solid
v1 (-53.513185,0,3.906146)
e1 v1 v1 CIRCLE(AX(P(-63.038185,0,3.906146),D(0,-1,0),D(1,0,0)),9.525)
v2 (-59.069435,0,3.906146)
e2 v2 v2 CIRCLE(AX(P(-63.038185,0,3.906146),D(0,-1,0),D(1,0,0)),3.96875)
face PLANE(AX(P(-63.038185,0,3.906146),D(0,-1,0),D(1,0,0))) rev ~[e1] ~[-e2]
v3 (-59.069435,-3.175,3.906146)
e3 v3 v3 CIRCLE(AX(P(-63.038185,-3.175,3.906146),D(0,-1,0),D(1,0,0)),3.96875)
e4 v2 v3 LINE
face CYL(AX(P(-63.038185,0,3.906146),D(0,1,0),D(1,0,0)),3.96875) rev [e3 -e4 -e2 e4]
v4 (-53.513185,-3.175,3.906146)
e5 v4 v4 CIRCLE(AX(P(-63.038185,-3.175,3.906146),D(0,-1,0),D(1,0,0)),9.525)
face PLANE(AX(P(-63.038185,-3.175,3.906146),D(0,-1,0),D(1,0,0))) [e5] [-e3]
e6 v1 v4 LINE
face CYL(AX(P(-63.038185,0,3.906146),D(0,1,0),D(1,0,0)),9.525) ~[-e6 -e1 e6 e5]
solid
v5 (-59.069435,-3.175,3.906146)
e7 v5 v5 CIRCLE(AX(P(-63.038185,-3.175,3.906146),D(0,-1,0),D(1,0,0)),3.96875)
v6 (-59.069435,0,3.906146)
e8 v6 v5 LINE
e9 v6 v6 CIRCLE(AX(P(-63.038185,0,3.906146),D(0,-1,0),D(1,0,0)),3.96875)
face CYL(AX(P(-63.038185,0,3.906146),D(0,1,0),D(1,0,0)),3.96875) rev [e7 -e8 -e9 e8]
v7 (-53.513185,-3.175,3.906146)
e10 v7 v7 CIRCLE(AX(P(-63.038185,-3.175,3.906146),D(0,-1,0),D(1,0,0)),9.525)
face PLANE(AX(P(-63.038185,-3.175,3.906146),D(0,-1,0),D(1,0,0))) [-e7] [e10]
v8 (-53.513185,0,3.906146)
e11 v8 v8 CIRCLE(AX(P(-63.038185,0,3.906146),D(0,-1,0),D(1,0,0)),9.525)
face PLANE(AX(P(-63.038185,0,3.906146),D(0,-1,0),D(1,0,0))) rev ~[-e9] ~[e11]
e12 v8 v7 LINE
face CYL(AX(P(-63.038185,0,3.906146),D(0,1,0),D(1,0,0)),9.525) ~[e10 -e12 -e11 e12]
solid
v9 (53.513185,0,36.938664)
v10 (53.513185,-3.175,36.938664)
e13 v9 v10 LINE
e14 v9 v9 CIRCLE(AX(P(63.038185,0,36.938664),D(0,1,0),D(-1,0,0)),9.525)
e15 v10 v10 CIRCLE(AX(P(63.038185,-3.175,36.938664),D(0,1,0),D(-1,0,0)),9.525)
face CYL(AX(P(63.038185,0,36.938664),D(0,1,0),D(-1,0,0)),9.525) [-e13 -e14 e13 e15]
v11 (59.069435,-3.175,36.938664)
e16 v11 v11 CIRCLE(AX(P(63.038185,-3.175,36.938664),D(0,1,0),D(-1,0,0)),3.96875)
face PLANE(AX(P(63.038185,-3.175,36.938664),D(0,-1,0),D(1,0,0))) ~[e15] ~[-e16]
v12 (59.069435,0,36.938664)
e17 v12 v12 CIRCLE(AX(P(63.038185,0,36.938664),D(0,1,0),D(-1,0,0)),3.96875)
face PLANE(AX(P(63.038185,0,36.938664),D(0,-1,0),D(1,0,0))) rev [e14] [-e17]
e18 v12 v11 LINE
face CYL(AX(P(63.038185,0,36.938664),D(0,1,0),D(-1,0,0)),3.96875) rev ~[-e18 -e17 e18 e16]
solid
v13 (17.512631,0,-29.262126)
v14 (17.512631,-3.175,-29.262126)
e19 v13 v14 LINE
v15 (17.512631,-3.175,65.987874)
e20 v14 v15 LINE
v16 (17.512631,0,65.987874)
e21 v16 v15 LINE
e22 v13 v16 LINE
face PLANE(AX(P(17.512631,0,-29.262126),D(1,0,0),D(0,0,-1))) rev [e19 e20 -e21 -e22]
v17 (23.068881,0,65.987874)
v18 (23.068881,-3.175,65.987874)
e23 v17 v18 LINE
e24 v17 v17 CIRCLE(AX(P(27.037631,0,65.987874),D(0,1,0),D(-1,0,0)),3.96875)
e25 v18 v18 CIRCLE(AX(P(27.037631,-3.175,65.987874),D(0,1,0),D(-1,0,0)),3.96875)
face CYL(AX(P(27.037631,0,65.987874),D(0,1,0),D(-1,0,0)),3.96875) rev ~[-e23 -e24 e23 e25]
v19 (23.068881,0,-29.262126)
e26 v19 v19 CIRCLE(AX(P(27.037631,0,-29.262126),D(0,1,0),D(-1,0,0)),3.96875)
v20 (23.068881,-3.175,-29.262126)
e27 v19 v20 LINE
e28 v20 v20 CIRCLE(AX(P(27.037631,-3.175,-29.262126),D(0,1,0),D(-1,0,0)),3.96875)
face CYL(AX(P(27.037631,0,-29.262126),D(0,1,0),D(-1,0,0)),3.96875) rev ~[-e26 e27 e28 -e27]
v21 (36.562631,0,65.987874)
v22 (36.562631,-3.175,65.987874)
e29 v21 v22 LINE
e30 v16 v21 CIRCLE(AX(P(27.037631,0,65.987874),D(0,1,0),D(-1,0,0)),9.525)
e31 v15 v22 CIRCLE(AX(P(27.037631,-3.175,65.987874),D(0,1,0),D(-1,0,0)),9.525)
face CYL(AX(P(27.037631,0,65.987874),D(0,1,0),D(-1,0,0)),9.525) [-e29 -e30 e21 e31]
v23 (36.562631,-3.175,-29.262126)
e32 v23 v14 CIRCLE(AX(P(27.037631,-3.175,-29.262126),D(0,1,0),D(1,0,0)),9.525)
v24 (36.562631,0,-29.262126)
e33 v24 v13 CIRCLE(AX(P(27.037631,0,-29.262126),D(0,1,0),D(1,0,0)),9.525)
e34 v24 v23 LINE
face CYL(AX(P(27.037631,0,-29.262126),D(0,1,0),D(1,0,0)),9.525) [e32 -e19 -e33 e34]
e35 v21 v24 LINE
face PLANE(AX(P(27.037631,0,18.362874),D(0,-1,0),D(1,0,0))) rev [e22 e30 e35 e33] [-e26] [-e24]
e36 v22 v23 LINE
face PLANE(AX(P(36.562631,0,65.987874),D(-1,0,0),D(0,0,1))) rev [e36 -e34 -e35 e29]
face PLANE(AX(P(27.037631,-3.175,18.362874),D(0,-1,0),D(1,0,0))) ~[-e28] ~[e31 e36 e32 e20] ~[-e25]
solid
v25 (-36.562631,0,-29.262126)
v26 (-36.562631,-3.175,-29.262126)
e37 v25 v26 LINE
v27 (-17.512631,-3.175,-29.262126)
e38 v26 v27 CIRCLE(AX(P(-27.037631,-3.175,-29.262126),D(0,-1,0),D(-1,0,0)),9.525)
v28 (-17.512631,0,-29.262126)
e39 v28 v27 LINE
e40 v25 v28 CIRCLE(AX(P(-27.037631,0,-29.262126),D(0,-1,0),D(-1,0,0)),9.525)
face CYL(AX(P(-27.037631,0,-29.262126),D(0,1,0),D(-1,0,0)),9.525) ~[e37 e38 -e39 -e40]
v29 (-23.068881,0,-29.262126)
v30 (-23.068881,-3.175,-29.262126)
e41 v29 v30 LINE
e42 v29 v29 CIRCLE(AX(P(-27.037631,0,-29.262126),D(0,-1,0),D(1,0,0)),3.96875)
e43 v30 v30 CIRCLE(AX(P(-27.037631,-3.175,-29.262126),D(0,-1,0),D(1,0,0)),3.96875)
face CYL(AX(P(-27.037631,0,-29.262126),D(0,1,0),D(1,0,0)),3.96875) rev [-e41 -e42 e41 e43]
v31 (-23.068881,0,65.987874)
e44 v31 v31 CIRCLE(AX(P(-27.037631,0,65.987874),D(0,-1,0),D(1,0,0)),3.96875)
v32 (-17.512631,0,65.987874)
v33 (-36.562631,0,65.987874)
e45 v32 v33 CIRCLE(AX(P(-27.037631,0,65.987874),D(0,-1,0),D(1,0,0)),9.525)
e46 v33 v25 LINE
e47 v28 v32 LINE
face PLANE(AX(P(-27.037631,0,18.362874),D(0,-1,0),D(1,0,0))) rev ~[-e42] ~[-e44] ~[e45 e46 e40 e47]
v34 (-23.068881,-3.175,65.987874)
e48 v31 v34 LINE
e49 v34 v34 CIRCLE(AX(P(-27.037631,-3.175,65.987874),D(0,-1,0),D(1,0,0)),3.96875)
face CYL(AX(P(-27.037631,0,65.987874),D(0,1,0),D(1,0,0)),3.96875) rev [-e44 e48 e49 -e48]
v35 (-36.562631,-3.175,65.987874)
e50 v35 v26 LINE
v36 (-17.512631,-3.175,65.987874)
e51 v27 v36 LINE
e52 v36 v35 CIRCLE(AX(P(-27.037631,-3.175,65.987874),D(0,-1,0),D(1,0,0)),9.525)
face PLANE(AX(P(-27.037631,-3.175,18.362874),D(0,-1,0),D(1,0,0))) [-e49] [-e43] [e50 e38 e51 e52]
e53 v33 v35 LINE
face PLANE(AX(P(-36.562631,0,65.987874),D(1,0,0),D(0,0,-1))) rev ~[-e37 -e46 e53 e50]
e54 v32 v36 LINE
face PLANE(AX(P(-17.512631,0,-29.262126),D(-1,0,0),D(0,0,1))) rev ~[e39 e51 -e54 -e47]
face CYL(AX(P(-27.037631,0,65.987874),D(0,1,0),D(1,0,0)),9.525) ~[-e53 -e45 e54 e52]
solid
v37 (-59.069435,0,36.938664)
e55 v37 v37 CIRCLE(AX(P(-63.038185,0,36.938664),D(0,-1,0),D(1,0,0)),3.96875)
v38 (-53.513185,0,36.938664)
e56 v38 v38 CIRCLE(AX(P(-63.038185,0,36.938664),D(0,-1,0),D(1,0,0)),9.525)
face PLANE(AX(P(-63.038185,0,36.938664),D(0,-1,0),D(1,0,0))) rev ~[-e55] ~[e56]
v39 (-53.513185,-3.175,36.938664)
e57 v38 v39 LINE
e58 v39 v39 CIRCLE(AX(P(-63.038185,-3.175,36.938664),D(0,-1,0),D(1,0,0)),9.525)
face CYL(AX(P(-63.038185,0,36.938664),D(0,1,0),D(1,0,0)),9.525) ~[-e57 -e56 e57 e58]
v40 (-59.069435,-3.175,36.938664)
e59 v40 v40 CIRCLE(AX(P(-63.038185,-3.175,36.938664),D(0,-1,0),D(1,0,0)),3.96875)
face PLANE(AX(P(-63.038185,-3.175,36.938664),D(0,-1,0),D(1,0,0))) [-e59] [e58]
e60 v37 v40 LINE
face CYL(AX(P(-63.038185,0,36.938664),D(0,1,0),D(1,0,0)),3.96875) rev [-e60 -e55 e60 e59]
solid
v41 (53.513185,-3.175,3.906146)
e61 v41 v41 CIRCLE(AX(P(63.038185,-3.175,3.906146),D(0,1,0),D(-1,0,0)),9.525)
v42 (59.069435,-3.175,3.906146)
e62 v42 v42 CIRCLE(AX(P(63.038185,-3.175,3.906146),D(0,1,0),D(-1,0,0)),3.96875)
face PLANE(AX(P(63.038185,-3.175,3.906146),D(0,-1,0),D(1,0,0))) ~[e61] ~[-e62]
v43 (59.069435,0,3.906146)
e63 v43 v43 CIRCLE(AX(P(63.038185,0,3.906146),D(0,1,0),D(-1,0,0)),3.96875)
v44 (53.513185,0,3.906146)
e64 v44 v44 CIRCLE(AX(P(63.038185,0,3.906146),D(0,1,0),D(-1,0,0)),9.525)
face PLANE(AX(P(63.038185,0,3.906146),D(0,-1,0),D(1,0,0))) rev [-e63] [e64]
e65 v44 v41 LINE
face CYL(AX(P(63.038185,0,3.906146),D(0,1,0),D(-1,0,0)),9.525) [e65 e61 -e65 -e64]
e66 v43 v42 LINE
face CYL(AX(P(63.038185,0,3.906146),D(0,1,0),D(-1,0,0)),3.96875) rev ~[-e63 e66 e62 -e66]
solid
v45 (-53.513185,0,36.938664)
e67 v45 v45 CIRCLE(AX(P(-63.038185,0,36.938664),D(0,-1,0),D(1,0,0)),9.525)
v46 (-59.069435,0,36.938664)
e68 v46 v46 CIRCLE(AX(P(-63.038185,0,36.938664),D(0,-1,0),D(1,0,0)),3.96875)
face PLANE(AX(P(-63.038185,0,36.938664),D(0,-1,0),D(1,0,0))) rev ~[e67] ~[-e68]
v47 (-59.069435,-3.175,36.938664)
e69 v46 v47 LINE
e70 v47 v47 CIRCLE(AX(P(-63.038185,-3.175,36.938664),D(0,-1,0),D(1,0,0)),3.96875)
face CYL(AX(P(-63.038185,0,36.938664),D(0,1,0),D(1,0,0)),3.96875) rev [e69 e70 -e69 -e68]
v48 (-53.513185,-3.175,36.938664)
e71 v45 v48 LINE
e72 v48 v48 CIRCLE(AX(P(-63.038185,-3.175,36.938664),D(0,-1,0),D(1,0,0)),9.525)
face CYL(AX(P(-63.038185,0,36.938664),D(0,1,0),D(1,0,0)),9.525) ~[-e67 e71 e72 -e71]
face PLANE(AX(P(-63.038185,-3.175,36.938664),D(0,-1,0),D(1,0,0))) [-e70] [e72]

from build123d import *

# Parameters (mm, degrees)
F0_R     = 9.525
F0_R_2   = 3.96875
F1_DEPTH = 3.175
F3_DEPTH = 3.175


with BuildPart() as f1:
    # F0 (on Front) → F1 (new body)
    with BuildSketch(Plane.XZ):
        with Locations((-63.0381852388, 36.9386635721)):
            Circle(F0_R)
        with Locations((-63.0381852388, 36.9386635721)):
            Circle(F0_R_2, mode=Mode.SUBTRACT)
    extrude(amount=F1_DEPTH)


with BuildPart() as f1b:
    # F0 (on Front) → F1, piece 2 (new body)
    with BuildSketch(Plane.XZ):
        with Locations((-63.0381852388, 3.9061459247)):
            Circle(F0_R)
        with Locations((-63.0381852388, 3.9061459247)):
            Circle(F0_R_2, mode=Mode.SUBTRACT)
    extrude(amount=F1_DEPTH)


with BuildPart() as f1c:
    # F0 (on Front) → F1, piece 3 (new body)
    with BuildSketch(Plane.XZ):
        with BuildLine():
            ThreePointArc((-17.5126310602, 65.9878742009), (-27.0376310602, 75.5128742009), (-36.5626310602, 65.9878742009))
            Line((-36.5626310602, 65.9878742009), (-36.5626310602, -29.2621257991))
            ThreePointArc((-36.5626310602, -29.2621257991), (-27.0376310602, -38.7871257991), (-17.5126310602, -29.2621257991))
            Line((-17.5126310602, -29.2621257991), (-17.5126310602, 65.9878742009))
        make_face()
        with Locations((-27.0376310602, -29.2621257991)):
            Circle(F0_R_2, mode=Mode.SUBTRACT)
        with Locations((-27.0376310602, 65.9878742009)):
            Circle(F0_R_2, mode=Mode.SUBTRACT)
    extrude(amount=F1_DEPTH)


with BuildPart() as f2_1:
    # F2: instance of F1c
    add(f1c.part.mirror(Plane.YZ))


with BuildPart() as f3:
    # F0 (on Front) → F3 (new body)
    with BuildSketch(Plane.XZ):
        with Locations((-63.0381852388, 36.9386635721)):
            Circle(F0_R)
        with Locations((-63.0381852388, 36.9386635721)):
            Circle(F0_R_2, mode=Mode.SUBTRACT)
    extrude(amount=F3_DEPTH)


with BuildPart() as f3b:
    # F0 (on Front) → F3, piece 2 (new body)
    with BuildSketch(Plane.XZ):
        with Locations((-63.0381852388, 3.9061459247)):
            Circle(F0_R)
        with Locations((-63.0381852388, 3.9061459247)):
            Circle(F0_R_2, mode=Mode.SUBTRACT)
    extrude(amount=F3_DEPTH)


with BuildPart() as f4_1:
    # F4: instance of F3
    add(f3.part.mirror(Plane.YZ))


with BuildPart() as f4_2:
    # F4: instance of F3b
    add(f3b.part.mirror(Plane.YZ))


solid = Compound([f1.part, f1b.part, f1c.part, f2_1.part, f3.part, f3b.part, f4_1.part, f4_2.part])
